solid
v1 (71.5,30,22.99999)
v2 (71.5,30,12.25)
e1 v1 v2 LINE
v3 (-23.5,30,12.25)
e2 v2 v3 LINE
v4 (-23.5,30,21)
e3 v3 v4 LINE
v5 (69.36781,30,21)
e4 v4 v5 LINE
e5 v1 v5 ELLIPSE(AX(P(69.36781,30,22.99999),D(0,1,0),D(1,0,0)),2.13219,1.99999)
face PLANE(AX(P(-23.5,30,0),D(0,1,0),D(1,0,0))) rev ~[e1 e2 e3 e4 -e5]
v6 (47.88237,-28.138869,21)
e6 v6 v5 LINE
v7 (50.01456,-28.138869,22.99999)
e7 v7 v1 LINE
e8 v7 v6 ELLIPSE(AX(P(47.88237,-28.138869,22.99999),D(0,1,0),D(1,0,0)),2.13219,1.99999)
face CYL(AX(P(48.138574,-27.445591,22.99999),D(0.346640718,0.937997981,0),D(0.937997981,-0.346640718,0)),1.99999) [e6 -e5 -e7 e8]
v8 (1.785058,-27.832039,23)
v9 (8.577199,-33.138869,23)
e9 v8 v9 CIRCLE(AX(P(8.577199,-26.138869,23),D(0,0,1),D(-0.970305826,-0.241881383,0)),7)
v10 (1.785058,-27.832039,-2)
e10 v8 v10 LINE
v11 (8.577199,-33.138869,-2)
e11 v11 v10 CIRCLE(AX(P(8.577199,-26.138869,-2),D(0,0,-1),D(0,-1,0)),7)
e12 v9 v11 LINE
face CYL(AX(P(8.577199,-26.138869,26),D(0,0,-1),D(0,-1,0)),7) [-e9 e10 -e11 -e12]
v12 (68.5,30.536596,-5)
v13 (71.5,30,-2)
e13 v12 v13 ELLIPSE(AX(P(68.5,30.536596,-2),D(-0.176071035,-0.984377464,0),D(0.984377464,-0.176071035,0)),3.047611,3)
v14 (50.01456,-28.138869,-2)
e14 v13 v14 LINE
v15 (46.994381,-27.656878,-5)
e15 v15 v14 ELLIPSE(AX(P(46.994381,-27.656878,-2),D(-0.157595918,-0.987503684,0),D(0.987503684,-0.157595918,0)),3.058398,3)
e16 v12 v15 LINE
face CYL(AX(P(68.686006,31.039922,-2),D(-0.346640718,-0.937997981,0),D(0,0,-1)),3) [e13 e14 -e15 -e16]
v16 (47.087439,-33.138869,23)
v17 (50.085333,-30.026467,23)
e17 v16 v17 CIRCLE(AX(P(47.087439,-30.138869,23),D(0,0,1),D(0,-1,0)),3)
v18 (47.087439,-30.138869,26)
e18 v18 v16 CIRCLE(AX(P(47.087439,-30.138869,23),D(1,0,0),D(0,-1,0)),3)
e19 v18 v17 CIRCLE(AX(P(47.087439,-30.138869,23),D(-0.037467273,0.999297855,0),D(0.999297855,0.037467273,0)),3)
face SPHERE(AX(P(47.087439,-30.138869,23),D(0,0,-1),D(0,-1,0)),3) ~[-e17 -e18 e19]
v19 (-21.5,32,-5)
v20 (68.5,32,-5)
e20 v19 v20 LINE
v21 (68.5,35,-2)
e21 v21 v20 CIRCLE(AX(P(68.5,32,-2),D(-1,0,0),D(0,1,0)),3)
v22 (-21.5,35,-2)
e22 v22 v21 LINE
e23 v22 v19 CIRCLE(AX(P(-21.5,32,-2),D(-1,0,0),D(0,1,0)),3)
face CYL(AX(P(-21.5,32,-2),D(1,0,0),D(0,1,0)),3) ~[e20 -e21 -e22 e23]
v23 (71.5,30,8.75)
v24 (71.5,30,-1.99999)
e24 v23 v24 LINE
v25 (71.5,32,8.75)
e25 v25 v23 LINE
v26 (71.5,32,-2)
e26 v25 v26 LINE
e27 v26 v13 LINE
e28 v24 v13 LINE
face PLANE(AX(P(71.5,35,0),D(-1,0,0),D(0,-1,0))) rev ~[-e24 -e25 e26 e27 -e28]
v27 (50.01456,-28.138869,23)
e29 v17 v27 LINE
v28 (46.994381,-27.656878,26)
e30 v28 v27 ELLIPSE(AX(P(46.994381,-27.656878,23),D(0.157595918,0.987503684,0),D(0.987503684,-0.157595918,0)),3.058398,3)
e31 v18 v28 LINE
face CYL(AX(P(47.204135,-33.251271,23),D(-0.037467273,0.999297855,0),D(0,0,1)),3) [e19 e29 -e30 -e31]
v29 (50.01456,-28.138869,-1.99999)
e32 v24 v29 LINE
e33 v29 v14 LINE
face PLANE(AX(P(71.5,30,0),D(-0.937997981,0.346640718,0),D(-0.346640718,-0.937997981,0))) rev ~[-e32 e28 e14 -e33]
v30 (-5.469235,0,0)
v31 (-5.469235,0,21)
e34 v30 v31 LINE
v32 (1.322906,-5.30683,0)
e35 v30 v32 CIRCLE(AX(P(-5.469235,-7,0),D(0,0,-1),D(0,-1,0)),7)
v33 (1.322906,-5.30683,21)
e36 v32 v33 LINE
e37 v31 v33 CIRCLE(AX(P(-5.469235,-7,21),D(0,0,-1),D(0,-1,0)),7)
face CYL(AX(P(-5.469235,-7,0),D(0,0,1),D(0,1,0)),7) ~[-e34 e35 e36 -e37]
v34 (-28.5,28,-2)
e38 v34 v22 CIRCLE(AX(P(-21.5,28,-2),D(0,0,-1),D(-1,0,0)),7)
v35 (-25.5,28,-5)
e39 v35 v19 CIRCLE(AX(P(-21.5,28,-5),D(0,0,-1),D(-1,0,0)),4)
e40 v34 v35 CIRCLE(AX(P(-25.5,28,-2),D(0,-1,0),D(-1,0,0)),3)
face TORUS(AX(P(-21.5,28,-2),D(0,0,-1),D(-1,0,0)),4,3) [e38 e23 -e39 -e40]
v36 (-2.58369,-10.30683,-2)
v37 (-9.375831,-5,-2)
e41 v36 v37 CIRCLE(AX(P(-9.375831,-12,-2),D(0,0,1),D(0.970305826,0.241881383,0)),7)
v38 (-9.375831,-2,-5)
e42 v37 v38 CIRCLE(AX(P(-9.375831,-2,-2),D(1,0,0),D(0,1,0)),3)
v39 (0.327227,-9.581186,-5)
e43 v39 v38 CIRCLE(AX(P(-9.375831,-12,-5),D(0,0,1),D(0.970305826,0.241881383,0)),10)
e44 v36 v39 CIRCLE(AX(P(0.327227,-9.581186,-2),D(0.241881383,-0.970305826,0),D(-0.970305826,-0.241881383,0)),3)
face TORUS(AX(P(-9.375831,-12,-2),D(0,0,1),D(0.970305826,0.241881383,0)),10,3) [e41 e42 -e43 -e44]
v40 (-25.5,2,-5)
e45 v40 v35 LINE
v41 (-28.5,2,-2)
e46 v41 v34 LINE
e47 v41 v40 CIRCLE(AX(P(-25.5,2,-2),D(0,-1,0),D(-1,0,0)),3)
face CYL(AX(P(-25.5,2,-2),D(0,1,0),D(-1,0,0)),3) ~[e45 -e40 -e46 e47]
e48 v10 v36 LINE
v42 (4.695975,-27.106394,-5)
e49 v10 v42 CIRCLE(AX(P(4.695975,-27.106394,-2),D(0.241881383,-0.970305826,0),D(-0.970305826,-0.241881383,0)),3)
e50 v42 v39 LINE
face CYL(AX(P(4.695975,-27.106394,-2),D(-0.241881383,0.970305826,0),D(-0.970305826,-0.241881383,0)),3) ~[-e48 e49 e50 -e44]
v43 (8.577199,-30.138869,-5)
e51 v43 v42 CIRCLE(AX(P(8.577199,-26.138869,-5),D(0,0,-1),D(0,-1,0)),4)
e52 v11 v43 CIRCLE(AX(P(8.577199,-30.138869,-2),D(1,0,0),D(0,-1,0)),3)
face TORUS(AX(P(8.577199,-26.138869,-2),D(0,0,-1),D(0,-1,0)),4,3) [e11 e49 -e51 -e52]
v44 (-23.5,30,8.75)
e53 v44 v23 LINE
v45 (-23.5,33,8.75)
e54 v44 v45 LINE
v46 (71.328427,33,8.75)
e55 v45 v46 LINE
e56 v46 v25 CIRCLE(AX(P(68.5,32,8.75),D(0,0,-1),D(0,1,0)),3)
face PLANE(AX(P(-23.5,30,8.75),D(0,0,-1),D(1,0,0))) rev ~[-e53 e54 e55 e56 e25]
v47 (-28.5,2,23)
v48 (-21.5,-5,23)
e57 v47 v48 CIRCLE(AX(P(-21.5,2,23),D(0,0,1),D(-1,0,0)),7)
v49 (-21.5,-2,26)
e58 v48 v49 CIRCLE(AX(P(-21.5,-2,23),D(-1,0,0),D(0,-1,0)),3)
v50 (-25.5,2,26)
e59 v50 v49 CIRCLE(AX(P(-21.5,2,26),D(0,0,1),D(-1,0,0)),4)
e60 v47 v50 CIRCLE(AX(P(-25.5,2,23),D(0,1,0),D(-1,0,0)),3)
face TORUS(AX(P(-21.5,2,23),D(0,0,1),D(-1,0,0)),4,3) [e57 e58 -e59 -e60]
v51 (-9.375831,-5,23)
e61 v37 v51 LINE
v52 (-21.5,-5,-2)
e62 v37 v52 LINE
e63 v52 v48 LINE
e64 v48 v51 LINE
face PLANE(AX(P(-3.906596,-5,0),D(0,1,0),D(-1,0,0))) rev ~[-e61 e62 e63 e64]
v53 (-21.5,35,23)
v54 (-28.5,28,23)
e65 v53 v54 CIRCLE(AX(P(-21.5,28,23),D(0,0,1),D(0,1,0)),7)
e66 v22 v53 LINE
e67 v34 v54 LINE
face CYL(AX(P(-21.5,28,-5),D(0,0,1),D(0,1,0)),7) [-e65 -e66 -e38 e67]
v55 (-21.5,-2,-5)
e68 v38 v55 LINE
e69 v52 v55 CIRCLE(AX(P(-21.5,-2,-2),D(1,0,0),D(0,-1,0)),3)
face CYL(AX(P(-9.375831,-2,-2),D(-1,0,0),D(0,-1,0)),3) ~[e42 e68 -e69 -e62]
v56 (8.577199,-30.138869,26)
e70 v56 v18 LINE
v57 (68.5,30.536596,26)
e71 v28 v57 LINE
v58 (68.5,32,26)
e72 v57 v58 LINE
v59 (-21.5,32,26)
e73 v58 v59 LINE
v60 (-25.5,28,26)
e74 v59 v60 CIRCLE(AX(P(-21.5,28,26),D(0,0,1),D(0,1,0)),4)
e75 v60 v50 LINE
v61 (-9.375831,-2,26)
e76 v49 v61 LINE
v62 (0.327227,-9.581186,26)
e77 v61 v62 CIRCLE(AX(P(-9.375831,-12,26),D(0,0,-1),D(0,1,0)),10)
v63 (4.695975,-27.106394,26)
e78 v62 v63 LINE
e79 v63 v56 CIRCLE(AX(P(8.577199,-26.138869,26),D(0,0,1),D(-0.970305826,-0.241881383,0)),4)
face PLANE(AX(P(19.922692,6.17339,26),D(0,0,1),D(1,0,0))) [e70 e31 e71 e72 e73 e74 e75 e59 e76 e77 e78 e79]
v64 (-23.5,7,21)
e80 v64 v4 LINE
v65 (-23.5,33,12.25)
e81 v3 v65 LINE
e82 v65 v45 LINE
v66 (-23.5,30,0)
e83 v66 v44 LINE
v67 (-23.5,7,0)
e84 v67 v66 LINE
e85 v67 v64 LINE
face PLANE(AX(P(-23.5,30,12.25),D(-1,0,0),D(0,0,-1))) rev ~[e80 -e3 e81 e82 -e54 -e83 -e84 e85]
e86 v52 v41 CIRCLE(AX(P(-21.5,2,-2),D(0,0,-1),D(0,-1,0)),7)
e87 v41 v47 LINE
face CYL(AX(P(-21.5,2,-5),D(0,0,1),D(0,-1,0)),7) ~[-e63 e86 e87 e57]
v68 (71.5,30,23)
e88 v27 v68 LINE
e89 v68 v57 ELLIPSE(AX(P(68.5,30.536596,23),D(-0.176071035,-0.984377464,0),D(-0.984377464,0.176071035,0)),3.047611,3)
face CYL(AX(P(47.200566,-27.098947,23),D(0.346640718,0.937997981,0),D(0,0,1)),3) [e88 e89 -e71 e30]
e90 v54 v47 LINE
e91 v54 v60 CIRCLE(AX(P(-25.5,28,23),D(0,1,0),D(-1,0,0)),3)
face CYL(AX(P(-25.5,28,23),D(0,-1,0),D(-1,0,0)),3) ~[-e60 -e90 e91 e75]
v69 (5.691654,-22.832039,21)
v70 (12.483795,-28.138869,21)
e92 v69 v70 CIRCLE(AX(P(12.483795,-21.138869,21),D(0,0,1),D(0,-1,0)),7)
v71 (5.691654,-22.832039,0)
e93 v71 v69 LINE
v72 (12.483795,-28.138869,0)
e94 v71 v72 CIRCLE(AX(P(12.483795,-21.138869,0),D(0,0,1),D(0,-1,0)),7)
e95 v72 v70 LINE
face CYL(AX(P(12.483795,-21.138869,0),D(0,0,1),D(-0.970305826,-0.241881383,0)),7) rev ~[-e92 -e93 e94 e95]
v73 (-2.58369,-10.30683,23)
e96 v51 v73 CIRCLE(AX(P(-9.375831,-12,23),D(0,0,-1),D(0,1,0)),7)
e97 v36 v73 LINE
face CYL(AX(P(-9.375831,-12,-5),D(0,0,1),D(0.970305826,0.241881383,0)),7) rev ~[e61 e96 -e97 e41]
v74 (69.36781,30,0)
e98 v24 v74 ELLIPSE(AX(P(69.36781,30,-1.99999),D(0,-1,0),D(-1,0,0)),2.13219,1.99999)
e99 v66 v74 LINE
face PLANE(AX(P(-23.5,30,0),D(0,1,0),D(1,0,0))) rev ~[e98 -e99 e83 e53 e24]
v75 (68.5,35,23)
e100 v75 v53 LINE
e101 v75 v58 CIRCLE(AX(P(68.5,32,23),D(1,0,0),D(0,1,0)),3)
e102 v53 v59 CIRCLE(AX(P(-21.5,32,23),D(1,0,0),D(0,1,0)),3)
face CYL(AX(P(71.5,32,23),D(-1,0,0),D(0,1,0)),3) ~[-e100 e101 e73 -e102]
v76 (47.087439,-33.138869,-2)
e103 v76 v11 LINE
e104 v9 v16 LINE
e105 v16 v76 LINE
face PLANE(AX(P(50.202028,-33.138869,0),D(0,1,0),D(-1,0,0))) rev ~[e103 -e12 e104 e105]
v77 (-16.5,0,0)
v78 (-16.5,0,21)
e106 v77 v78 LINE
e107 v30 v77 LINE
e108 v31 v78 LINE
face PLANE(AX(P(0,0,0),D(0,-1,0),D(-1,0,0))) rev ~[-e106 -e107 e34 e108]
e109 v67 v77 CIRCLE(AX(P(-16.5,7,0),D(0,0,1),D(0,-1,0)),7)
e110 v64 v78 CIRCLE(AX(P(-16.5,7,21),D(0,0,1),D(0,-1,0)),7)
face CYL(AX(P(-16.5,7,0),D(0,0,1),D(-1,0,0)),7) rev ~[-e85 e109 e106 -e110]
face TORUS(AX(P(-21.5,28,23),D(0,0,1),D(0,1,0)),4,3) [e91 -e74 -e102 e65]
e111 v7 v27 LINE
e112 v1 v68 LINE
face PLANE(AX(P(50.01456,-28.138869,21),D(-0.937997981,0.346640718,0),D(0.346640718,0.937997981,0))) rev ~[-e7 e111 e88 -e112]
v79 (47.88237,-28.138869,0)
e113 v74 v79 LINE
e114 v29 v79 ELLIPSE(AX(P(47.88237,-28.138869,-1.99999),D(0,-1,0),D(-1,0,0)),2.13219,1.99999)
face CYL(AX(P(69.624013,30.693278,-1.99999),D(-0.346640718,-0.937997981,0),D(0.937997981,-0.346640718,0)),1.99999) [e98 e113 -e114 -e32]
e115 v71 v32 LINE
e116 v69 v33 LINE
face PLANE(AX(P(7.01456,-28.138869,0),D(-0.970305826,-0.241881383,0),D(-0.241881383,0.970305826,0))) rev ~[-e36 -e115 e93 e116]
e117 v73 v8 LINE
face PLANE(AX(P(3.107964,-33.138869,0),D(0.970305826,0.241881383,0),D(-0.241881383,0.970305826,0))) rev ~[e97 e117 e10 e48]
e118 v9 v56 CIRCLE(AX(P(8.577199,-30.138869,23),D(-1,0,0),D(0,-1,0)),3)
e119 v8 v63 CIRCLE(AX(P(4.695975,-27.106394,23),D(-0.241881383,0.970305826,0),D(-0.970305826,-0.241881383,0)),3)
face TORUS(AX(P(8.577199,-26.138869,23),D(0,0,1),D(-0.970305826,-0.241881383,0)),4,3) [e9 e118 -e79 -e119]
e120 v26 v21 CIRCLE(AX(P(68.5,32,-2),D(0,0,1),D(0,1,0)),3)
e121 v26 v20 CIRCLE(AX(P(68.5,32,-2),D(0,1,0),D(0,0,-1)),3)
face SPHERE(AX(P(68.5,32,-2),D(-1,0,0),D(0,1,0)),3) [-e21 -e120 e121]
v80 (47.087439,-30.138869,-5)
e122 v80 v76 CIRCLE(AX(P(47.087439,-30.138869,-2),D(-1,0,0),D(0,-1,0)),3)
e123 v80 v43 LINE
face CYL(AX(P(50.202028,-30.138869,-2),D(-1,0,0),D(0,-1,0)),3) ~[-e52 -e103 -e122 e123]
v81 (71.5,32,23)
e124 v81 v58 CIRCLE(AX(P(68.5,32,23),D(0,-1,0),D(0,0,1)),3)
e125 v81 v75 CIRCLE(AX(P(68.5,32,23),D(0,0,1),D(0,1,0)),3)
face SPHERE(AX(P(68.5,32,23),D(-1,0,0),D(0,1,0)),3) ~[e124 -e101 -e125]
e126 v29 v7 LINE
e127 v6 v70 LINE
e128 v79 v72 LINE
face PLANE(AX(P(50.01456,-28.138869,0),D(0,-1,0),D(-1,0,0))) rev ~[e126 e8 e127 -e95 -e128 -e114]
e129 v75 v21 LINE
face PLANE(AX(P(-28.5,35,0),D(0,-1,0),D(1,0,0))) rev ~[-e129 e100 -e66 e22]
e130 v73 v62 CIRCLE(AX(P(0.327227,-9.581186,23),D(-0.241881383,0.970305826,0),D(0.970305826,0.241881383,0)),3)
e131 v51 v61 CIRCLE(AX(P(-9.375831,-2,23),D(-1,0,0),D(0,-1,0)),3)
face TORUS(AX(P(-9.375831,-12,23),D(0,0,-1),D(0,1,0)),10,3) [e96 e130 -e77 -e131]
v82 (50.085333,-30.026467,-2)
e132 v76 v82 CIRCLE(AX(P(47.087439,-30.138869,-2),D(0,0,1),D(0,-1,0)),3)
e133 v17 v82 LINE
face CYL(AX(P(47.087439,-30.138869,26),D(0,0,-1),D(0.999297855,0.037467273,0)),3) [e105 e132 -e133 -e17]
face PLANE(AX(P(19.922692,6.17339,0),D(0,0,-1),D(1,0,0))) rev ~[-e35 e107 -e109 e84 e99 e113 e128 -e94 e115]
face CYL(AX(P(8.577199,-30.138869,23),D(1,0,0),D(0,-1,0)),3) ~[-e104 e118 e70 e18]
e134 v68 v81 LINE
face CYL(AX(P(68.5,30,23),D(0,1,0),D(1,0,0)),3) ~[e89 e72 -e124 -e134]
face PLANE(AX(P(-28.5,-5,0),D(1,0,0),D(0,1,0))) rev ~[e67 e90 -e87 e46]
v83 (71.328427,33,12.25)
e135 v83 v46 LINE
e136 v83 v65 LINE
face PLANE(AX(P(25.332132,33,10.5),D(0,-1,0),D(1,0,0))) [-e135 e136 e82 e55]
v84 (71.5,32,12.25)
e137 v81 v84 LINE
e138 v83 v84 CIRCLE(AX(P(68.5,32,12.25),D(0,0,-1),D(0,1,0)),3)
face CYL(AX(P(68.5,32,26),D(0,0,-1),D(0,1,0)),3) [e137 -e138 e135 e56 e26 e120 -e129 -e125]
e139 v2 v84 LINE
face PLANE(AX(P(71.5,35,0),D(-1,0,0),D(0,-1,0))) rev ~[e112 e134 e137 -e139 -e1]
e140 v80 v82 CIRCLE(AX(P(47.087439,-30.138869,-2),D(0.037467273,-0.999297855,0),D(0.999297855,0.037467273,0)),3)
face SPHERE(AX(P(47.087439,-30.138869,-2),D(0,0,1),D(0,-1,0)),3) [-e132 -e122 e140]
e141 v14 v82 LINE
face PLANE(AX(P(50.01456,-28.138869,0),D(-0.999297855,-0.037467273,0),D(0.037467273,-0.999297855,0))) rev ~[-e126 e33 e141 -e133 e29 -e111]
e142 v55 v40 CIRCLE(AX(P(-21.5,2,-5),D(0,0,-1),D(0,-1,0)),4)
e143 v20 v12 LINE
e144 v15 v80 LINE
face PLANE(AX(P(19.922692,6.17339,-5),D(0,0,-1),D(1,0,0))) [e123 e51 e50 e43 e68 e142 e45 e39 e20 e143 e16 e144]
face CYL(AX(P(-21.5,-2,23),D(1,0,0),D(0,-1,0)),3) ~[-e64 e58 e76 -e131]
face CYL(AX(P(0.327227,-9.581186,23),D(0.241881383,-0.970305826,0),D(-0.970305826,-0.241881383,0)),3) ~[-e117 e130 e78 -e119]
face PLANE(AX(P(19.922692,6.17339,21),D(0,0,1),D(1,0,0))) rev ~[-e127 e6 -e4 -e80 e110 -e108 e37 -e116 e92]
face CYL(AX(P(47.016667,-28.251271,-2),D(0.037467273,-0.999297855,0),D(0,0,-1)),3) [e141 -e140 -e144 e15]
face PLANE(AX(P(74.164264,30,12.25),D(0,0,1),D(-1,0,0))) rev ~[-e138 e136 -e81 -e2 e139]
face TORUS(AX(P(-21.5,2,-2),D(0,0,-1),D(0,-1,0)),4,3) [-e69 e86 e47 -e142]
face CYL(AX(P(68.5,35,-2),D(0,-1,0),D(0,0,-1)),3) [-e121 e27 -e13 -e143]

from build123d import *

# Parameters (mm, degrees)
F1_DEPTH = 21
F4_DEPTH = 5
F5_DEPTH = 5
F6_R     = 7
F7_R     = 3
F9_DEPTH = 3
F10_R    = 1.99999


# Not quite as in the source:
# - a fillet or chamfer is up to 0.001 mm smaller than in the source, because OpenCascade refuses the exact size


with BuildPart() as f1:
    # F0 (on Top) → F1 (new body)
    with BuildSketch(Plane.XY):
        Polygon((-23.5, 30), (71.5, 30), (71.5, 35), (-28.5, 35), (-28.5, -5), (-3.906596233, -5), (3.1079638678, -33.1388689644), (50.2020280941, -33.1388689644), (50.0145601007, -28.1388689644), (7.0145601007, -28.1388689644), (0, 0), (-23.5, 0), align=None)
    extrude(amount=F1_DEPTH)

    # F3 (on face) → F4 (join)
    with BuildSketch(Plane.XY.offset(21)):
        Polygon((71.5, 35), (-28.5, 35), (-28.5, -5), (-3.906596233, -5), (3.1079638678, -33.1388689644), (50.2020280941, -33.1388689644), (50.0145601007, -28.1388689644), (71.5, 30), align=None)
    extrude(amount=F4_DEPTH)

    # F2 (on face) → F5 (join)
    with BuildSketch(Plane(origin=(0, 0, 0), x_dir=(1, 0, 0), z_dir=(0, 0, -1))):
        Polygon((-28.5, -35), (71.5, -35), (71.5, -30), (50.0145601007, 28.1388689644), (50.2020280941, 33.1388689644), (3.1079638678, 33.1388689644), (-3.906596233, 5), (-28.5, 5), align=None)
    extrude(amount=F5_DEPTH)

    # F6
    f6_edges = [f1.edges().sort_by_distance(p)[0] for p in [
        (0, 0, 10.5),
        (-3.906596, -5, 10.5),
        (7.01456, -28.138869, 10.5),
        (3.107964, -33.138869, 10.5),
        (-28.5, -5, 10.5),
        (-28.5, 35, 10.5),
        (-23.5, 0, 10.5),
    ]]
    fillet(f6_edges, radius=F6_R)

    # F7
    f7_edges = [f1.edges().sort_by_distance(p)[0] for p in [
        (25, 35, 26),
        (25, 35, -5),
        (71.5, 35, 10.5),
        (-26.449747, 32.949747, 26),
        (71.5, 32.5, 26),
        (-28.5, 15, 26),
        (60.75728, 0.930566, 26),
        (-26.449747, -2.949747, 26),
        (50.108294, -30.638869, 26),
        (-15.437915, -5, 26),
        (29.389613, -33.138869, 26),
        (-5.066085, -6.484015, 26),
        (4.267453, -31.654854, 26),
        (-0.399316, -19.069434, 26),
        (-15.437915, -5, -5),
        (-5.066085, -6.484015, -5),
        (-26.449747, -2.949747, -5),
        (-0.399316, -19.069434, -5),
        (-28.5, 15, -5),
        (4.267453, -31.654854, -5),
        (-26.449747, 32.949747, -5),
        (29.389613, -33.138869, -5),
        (50.108294, -30.638869, -5),
        (71.5, 32.5, -5),
        (60.75728, 0.930566, -5),
        (50.202028, -33.138869, 10.5),
    ]]
    fillet(f7_edges, radius=F7_R)

    # F8 (on face) → F9 (cut)
    with BuildSketch(Plane.XZ.offset(-30)):
        Polygon((-23.5, 12.25), (-23.5, 10.5), (-23.5, 8.75), (74.1642639041, 8.75), (74.1642639041, 12.25), align=None)
    extrude(amount=-F9_DEPTH, mode=Mode.SUBTRACT)

    # F10 (radius 2 in the source; OpenCascade refuses exactly that, so slightly less here)
    f10_edges = [f1.edges().sort_by_distance(p)[0] for p in [
        (60.75728, 0.930566, 21),
        (60.75728, 0.930566, 0),
    ]]
    fillet(f10_edges, radius=F10_R)


solid = f1.part
